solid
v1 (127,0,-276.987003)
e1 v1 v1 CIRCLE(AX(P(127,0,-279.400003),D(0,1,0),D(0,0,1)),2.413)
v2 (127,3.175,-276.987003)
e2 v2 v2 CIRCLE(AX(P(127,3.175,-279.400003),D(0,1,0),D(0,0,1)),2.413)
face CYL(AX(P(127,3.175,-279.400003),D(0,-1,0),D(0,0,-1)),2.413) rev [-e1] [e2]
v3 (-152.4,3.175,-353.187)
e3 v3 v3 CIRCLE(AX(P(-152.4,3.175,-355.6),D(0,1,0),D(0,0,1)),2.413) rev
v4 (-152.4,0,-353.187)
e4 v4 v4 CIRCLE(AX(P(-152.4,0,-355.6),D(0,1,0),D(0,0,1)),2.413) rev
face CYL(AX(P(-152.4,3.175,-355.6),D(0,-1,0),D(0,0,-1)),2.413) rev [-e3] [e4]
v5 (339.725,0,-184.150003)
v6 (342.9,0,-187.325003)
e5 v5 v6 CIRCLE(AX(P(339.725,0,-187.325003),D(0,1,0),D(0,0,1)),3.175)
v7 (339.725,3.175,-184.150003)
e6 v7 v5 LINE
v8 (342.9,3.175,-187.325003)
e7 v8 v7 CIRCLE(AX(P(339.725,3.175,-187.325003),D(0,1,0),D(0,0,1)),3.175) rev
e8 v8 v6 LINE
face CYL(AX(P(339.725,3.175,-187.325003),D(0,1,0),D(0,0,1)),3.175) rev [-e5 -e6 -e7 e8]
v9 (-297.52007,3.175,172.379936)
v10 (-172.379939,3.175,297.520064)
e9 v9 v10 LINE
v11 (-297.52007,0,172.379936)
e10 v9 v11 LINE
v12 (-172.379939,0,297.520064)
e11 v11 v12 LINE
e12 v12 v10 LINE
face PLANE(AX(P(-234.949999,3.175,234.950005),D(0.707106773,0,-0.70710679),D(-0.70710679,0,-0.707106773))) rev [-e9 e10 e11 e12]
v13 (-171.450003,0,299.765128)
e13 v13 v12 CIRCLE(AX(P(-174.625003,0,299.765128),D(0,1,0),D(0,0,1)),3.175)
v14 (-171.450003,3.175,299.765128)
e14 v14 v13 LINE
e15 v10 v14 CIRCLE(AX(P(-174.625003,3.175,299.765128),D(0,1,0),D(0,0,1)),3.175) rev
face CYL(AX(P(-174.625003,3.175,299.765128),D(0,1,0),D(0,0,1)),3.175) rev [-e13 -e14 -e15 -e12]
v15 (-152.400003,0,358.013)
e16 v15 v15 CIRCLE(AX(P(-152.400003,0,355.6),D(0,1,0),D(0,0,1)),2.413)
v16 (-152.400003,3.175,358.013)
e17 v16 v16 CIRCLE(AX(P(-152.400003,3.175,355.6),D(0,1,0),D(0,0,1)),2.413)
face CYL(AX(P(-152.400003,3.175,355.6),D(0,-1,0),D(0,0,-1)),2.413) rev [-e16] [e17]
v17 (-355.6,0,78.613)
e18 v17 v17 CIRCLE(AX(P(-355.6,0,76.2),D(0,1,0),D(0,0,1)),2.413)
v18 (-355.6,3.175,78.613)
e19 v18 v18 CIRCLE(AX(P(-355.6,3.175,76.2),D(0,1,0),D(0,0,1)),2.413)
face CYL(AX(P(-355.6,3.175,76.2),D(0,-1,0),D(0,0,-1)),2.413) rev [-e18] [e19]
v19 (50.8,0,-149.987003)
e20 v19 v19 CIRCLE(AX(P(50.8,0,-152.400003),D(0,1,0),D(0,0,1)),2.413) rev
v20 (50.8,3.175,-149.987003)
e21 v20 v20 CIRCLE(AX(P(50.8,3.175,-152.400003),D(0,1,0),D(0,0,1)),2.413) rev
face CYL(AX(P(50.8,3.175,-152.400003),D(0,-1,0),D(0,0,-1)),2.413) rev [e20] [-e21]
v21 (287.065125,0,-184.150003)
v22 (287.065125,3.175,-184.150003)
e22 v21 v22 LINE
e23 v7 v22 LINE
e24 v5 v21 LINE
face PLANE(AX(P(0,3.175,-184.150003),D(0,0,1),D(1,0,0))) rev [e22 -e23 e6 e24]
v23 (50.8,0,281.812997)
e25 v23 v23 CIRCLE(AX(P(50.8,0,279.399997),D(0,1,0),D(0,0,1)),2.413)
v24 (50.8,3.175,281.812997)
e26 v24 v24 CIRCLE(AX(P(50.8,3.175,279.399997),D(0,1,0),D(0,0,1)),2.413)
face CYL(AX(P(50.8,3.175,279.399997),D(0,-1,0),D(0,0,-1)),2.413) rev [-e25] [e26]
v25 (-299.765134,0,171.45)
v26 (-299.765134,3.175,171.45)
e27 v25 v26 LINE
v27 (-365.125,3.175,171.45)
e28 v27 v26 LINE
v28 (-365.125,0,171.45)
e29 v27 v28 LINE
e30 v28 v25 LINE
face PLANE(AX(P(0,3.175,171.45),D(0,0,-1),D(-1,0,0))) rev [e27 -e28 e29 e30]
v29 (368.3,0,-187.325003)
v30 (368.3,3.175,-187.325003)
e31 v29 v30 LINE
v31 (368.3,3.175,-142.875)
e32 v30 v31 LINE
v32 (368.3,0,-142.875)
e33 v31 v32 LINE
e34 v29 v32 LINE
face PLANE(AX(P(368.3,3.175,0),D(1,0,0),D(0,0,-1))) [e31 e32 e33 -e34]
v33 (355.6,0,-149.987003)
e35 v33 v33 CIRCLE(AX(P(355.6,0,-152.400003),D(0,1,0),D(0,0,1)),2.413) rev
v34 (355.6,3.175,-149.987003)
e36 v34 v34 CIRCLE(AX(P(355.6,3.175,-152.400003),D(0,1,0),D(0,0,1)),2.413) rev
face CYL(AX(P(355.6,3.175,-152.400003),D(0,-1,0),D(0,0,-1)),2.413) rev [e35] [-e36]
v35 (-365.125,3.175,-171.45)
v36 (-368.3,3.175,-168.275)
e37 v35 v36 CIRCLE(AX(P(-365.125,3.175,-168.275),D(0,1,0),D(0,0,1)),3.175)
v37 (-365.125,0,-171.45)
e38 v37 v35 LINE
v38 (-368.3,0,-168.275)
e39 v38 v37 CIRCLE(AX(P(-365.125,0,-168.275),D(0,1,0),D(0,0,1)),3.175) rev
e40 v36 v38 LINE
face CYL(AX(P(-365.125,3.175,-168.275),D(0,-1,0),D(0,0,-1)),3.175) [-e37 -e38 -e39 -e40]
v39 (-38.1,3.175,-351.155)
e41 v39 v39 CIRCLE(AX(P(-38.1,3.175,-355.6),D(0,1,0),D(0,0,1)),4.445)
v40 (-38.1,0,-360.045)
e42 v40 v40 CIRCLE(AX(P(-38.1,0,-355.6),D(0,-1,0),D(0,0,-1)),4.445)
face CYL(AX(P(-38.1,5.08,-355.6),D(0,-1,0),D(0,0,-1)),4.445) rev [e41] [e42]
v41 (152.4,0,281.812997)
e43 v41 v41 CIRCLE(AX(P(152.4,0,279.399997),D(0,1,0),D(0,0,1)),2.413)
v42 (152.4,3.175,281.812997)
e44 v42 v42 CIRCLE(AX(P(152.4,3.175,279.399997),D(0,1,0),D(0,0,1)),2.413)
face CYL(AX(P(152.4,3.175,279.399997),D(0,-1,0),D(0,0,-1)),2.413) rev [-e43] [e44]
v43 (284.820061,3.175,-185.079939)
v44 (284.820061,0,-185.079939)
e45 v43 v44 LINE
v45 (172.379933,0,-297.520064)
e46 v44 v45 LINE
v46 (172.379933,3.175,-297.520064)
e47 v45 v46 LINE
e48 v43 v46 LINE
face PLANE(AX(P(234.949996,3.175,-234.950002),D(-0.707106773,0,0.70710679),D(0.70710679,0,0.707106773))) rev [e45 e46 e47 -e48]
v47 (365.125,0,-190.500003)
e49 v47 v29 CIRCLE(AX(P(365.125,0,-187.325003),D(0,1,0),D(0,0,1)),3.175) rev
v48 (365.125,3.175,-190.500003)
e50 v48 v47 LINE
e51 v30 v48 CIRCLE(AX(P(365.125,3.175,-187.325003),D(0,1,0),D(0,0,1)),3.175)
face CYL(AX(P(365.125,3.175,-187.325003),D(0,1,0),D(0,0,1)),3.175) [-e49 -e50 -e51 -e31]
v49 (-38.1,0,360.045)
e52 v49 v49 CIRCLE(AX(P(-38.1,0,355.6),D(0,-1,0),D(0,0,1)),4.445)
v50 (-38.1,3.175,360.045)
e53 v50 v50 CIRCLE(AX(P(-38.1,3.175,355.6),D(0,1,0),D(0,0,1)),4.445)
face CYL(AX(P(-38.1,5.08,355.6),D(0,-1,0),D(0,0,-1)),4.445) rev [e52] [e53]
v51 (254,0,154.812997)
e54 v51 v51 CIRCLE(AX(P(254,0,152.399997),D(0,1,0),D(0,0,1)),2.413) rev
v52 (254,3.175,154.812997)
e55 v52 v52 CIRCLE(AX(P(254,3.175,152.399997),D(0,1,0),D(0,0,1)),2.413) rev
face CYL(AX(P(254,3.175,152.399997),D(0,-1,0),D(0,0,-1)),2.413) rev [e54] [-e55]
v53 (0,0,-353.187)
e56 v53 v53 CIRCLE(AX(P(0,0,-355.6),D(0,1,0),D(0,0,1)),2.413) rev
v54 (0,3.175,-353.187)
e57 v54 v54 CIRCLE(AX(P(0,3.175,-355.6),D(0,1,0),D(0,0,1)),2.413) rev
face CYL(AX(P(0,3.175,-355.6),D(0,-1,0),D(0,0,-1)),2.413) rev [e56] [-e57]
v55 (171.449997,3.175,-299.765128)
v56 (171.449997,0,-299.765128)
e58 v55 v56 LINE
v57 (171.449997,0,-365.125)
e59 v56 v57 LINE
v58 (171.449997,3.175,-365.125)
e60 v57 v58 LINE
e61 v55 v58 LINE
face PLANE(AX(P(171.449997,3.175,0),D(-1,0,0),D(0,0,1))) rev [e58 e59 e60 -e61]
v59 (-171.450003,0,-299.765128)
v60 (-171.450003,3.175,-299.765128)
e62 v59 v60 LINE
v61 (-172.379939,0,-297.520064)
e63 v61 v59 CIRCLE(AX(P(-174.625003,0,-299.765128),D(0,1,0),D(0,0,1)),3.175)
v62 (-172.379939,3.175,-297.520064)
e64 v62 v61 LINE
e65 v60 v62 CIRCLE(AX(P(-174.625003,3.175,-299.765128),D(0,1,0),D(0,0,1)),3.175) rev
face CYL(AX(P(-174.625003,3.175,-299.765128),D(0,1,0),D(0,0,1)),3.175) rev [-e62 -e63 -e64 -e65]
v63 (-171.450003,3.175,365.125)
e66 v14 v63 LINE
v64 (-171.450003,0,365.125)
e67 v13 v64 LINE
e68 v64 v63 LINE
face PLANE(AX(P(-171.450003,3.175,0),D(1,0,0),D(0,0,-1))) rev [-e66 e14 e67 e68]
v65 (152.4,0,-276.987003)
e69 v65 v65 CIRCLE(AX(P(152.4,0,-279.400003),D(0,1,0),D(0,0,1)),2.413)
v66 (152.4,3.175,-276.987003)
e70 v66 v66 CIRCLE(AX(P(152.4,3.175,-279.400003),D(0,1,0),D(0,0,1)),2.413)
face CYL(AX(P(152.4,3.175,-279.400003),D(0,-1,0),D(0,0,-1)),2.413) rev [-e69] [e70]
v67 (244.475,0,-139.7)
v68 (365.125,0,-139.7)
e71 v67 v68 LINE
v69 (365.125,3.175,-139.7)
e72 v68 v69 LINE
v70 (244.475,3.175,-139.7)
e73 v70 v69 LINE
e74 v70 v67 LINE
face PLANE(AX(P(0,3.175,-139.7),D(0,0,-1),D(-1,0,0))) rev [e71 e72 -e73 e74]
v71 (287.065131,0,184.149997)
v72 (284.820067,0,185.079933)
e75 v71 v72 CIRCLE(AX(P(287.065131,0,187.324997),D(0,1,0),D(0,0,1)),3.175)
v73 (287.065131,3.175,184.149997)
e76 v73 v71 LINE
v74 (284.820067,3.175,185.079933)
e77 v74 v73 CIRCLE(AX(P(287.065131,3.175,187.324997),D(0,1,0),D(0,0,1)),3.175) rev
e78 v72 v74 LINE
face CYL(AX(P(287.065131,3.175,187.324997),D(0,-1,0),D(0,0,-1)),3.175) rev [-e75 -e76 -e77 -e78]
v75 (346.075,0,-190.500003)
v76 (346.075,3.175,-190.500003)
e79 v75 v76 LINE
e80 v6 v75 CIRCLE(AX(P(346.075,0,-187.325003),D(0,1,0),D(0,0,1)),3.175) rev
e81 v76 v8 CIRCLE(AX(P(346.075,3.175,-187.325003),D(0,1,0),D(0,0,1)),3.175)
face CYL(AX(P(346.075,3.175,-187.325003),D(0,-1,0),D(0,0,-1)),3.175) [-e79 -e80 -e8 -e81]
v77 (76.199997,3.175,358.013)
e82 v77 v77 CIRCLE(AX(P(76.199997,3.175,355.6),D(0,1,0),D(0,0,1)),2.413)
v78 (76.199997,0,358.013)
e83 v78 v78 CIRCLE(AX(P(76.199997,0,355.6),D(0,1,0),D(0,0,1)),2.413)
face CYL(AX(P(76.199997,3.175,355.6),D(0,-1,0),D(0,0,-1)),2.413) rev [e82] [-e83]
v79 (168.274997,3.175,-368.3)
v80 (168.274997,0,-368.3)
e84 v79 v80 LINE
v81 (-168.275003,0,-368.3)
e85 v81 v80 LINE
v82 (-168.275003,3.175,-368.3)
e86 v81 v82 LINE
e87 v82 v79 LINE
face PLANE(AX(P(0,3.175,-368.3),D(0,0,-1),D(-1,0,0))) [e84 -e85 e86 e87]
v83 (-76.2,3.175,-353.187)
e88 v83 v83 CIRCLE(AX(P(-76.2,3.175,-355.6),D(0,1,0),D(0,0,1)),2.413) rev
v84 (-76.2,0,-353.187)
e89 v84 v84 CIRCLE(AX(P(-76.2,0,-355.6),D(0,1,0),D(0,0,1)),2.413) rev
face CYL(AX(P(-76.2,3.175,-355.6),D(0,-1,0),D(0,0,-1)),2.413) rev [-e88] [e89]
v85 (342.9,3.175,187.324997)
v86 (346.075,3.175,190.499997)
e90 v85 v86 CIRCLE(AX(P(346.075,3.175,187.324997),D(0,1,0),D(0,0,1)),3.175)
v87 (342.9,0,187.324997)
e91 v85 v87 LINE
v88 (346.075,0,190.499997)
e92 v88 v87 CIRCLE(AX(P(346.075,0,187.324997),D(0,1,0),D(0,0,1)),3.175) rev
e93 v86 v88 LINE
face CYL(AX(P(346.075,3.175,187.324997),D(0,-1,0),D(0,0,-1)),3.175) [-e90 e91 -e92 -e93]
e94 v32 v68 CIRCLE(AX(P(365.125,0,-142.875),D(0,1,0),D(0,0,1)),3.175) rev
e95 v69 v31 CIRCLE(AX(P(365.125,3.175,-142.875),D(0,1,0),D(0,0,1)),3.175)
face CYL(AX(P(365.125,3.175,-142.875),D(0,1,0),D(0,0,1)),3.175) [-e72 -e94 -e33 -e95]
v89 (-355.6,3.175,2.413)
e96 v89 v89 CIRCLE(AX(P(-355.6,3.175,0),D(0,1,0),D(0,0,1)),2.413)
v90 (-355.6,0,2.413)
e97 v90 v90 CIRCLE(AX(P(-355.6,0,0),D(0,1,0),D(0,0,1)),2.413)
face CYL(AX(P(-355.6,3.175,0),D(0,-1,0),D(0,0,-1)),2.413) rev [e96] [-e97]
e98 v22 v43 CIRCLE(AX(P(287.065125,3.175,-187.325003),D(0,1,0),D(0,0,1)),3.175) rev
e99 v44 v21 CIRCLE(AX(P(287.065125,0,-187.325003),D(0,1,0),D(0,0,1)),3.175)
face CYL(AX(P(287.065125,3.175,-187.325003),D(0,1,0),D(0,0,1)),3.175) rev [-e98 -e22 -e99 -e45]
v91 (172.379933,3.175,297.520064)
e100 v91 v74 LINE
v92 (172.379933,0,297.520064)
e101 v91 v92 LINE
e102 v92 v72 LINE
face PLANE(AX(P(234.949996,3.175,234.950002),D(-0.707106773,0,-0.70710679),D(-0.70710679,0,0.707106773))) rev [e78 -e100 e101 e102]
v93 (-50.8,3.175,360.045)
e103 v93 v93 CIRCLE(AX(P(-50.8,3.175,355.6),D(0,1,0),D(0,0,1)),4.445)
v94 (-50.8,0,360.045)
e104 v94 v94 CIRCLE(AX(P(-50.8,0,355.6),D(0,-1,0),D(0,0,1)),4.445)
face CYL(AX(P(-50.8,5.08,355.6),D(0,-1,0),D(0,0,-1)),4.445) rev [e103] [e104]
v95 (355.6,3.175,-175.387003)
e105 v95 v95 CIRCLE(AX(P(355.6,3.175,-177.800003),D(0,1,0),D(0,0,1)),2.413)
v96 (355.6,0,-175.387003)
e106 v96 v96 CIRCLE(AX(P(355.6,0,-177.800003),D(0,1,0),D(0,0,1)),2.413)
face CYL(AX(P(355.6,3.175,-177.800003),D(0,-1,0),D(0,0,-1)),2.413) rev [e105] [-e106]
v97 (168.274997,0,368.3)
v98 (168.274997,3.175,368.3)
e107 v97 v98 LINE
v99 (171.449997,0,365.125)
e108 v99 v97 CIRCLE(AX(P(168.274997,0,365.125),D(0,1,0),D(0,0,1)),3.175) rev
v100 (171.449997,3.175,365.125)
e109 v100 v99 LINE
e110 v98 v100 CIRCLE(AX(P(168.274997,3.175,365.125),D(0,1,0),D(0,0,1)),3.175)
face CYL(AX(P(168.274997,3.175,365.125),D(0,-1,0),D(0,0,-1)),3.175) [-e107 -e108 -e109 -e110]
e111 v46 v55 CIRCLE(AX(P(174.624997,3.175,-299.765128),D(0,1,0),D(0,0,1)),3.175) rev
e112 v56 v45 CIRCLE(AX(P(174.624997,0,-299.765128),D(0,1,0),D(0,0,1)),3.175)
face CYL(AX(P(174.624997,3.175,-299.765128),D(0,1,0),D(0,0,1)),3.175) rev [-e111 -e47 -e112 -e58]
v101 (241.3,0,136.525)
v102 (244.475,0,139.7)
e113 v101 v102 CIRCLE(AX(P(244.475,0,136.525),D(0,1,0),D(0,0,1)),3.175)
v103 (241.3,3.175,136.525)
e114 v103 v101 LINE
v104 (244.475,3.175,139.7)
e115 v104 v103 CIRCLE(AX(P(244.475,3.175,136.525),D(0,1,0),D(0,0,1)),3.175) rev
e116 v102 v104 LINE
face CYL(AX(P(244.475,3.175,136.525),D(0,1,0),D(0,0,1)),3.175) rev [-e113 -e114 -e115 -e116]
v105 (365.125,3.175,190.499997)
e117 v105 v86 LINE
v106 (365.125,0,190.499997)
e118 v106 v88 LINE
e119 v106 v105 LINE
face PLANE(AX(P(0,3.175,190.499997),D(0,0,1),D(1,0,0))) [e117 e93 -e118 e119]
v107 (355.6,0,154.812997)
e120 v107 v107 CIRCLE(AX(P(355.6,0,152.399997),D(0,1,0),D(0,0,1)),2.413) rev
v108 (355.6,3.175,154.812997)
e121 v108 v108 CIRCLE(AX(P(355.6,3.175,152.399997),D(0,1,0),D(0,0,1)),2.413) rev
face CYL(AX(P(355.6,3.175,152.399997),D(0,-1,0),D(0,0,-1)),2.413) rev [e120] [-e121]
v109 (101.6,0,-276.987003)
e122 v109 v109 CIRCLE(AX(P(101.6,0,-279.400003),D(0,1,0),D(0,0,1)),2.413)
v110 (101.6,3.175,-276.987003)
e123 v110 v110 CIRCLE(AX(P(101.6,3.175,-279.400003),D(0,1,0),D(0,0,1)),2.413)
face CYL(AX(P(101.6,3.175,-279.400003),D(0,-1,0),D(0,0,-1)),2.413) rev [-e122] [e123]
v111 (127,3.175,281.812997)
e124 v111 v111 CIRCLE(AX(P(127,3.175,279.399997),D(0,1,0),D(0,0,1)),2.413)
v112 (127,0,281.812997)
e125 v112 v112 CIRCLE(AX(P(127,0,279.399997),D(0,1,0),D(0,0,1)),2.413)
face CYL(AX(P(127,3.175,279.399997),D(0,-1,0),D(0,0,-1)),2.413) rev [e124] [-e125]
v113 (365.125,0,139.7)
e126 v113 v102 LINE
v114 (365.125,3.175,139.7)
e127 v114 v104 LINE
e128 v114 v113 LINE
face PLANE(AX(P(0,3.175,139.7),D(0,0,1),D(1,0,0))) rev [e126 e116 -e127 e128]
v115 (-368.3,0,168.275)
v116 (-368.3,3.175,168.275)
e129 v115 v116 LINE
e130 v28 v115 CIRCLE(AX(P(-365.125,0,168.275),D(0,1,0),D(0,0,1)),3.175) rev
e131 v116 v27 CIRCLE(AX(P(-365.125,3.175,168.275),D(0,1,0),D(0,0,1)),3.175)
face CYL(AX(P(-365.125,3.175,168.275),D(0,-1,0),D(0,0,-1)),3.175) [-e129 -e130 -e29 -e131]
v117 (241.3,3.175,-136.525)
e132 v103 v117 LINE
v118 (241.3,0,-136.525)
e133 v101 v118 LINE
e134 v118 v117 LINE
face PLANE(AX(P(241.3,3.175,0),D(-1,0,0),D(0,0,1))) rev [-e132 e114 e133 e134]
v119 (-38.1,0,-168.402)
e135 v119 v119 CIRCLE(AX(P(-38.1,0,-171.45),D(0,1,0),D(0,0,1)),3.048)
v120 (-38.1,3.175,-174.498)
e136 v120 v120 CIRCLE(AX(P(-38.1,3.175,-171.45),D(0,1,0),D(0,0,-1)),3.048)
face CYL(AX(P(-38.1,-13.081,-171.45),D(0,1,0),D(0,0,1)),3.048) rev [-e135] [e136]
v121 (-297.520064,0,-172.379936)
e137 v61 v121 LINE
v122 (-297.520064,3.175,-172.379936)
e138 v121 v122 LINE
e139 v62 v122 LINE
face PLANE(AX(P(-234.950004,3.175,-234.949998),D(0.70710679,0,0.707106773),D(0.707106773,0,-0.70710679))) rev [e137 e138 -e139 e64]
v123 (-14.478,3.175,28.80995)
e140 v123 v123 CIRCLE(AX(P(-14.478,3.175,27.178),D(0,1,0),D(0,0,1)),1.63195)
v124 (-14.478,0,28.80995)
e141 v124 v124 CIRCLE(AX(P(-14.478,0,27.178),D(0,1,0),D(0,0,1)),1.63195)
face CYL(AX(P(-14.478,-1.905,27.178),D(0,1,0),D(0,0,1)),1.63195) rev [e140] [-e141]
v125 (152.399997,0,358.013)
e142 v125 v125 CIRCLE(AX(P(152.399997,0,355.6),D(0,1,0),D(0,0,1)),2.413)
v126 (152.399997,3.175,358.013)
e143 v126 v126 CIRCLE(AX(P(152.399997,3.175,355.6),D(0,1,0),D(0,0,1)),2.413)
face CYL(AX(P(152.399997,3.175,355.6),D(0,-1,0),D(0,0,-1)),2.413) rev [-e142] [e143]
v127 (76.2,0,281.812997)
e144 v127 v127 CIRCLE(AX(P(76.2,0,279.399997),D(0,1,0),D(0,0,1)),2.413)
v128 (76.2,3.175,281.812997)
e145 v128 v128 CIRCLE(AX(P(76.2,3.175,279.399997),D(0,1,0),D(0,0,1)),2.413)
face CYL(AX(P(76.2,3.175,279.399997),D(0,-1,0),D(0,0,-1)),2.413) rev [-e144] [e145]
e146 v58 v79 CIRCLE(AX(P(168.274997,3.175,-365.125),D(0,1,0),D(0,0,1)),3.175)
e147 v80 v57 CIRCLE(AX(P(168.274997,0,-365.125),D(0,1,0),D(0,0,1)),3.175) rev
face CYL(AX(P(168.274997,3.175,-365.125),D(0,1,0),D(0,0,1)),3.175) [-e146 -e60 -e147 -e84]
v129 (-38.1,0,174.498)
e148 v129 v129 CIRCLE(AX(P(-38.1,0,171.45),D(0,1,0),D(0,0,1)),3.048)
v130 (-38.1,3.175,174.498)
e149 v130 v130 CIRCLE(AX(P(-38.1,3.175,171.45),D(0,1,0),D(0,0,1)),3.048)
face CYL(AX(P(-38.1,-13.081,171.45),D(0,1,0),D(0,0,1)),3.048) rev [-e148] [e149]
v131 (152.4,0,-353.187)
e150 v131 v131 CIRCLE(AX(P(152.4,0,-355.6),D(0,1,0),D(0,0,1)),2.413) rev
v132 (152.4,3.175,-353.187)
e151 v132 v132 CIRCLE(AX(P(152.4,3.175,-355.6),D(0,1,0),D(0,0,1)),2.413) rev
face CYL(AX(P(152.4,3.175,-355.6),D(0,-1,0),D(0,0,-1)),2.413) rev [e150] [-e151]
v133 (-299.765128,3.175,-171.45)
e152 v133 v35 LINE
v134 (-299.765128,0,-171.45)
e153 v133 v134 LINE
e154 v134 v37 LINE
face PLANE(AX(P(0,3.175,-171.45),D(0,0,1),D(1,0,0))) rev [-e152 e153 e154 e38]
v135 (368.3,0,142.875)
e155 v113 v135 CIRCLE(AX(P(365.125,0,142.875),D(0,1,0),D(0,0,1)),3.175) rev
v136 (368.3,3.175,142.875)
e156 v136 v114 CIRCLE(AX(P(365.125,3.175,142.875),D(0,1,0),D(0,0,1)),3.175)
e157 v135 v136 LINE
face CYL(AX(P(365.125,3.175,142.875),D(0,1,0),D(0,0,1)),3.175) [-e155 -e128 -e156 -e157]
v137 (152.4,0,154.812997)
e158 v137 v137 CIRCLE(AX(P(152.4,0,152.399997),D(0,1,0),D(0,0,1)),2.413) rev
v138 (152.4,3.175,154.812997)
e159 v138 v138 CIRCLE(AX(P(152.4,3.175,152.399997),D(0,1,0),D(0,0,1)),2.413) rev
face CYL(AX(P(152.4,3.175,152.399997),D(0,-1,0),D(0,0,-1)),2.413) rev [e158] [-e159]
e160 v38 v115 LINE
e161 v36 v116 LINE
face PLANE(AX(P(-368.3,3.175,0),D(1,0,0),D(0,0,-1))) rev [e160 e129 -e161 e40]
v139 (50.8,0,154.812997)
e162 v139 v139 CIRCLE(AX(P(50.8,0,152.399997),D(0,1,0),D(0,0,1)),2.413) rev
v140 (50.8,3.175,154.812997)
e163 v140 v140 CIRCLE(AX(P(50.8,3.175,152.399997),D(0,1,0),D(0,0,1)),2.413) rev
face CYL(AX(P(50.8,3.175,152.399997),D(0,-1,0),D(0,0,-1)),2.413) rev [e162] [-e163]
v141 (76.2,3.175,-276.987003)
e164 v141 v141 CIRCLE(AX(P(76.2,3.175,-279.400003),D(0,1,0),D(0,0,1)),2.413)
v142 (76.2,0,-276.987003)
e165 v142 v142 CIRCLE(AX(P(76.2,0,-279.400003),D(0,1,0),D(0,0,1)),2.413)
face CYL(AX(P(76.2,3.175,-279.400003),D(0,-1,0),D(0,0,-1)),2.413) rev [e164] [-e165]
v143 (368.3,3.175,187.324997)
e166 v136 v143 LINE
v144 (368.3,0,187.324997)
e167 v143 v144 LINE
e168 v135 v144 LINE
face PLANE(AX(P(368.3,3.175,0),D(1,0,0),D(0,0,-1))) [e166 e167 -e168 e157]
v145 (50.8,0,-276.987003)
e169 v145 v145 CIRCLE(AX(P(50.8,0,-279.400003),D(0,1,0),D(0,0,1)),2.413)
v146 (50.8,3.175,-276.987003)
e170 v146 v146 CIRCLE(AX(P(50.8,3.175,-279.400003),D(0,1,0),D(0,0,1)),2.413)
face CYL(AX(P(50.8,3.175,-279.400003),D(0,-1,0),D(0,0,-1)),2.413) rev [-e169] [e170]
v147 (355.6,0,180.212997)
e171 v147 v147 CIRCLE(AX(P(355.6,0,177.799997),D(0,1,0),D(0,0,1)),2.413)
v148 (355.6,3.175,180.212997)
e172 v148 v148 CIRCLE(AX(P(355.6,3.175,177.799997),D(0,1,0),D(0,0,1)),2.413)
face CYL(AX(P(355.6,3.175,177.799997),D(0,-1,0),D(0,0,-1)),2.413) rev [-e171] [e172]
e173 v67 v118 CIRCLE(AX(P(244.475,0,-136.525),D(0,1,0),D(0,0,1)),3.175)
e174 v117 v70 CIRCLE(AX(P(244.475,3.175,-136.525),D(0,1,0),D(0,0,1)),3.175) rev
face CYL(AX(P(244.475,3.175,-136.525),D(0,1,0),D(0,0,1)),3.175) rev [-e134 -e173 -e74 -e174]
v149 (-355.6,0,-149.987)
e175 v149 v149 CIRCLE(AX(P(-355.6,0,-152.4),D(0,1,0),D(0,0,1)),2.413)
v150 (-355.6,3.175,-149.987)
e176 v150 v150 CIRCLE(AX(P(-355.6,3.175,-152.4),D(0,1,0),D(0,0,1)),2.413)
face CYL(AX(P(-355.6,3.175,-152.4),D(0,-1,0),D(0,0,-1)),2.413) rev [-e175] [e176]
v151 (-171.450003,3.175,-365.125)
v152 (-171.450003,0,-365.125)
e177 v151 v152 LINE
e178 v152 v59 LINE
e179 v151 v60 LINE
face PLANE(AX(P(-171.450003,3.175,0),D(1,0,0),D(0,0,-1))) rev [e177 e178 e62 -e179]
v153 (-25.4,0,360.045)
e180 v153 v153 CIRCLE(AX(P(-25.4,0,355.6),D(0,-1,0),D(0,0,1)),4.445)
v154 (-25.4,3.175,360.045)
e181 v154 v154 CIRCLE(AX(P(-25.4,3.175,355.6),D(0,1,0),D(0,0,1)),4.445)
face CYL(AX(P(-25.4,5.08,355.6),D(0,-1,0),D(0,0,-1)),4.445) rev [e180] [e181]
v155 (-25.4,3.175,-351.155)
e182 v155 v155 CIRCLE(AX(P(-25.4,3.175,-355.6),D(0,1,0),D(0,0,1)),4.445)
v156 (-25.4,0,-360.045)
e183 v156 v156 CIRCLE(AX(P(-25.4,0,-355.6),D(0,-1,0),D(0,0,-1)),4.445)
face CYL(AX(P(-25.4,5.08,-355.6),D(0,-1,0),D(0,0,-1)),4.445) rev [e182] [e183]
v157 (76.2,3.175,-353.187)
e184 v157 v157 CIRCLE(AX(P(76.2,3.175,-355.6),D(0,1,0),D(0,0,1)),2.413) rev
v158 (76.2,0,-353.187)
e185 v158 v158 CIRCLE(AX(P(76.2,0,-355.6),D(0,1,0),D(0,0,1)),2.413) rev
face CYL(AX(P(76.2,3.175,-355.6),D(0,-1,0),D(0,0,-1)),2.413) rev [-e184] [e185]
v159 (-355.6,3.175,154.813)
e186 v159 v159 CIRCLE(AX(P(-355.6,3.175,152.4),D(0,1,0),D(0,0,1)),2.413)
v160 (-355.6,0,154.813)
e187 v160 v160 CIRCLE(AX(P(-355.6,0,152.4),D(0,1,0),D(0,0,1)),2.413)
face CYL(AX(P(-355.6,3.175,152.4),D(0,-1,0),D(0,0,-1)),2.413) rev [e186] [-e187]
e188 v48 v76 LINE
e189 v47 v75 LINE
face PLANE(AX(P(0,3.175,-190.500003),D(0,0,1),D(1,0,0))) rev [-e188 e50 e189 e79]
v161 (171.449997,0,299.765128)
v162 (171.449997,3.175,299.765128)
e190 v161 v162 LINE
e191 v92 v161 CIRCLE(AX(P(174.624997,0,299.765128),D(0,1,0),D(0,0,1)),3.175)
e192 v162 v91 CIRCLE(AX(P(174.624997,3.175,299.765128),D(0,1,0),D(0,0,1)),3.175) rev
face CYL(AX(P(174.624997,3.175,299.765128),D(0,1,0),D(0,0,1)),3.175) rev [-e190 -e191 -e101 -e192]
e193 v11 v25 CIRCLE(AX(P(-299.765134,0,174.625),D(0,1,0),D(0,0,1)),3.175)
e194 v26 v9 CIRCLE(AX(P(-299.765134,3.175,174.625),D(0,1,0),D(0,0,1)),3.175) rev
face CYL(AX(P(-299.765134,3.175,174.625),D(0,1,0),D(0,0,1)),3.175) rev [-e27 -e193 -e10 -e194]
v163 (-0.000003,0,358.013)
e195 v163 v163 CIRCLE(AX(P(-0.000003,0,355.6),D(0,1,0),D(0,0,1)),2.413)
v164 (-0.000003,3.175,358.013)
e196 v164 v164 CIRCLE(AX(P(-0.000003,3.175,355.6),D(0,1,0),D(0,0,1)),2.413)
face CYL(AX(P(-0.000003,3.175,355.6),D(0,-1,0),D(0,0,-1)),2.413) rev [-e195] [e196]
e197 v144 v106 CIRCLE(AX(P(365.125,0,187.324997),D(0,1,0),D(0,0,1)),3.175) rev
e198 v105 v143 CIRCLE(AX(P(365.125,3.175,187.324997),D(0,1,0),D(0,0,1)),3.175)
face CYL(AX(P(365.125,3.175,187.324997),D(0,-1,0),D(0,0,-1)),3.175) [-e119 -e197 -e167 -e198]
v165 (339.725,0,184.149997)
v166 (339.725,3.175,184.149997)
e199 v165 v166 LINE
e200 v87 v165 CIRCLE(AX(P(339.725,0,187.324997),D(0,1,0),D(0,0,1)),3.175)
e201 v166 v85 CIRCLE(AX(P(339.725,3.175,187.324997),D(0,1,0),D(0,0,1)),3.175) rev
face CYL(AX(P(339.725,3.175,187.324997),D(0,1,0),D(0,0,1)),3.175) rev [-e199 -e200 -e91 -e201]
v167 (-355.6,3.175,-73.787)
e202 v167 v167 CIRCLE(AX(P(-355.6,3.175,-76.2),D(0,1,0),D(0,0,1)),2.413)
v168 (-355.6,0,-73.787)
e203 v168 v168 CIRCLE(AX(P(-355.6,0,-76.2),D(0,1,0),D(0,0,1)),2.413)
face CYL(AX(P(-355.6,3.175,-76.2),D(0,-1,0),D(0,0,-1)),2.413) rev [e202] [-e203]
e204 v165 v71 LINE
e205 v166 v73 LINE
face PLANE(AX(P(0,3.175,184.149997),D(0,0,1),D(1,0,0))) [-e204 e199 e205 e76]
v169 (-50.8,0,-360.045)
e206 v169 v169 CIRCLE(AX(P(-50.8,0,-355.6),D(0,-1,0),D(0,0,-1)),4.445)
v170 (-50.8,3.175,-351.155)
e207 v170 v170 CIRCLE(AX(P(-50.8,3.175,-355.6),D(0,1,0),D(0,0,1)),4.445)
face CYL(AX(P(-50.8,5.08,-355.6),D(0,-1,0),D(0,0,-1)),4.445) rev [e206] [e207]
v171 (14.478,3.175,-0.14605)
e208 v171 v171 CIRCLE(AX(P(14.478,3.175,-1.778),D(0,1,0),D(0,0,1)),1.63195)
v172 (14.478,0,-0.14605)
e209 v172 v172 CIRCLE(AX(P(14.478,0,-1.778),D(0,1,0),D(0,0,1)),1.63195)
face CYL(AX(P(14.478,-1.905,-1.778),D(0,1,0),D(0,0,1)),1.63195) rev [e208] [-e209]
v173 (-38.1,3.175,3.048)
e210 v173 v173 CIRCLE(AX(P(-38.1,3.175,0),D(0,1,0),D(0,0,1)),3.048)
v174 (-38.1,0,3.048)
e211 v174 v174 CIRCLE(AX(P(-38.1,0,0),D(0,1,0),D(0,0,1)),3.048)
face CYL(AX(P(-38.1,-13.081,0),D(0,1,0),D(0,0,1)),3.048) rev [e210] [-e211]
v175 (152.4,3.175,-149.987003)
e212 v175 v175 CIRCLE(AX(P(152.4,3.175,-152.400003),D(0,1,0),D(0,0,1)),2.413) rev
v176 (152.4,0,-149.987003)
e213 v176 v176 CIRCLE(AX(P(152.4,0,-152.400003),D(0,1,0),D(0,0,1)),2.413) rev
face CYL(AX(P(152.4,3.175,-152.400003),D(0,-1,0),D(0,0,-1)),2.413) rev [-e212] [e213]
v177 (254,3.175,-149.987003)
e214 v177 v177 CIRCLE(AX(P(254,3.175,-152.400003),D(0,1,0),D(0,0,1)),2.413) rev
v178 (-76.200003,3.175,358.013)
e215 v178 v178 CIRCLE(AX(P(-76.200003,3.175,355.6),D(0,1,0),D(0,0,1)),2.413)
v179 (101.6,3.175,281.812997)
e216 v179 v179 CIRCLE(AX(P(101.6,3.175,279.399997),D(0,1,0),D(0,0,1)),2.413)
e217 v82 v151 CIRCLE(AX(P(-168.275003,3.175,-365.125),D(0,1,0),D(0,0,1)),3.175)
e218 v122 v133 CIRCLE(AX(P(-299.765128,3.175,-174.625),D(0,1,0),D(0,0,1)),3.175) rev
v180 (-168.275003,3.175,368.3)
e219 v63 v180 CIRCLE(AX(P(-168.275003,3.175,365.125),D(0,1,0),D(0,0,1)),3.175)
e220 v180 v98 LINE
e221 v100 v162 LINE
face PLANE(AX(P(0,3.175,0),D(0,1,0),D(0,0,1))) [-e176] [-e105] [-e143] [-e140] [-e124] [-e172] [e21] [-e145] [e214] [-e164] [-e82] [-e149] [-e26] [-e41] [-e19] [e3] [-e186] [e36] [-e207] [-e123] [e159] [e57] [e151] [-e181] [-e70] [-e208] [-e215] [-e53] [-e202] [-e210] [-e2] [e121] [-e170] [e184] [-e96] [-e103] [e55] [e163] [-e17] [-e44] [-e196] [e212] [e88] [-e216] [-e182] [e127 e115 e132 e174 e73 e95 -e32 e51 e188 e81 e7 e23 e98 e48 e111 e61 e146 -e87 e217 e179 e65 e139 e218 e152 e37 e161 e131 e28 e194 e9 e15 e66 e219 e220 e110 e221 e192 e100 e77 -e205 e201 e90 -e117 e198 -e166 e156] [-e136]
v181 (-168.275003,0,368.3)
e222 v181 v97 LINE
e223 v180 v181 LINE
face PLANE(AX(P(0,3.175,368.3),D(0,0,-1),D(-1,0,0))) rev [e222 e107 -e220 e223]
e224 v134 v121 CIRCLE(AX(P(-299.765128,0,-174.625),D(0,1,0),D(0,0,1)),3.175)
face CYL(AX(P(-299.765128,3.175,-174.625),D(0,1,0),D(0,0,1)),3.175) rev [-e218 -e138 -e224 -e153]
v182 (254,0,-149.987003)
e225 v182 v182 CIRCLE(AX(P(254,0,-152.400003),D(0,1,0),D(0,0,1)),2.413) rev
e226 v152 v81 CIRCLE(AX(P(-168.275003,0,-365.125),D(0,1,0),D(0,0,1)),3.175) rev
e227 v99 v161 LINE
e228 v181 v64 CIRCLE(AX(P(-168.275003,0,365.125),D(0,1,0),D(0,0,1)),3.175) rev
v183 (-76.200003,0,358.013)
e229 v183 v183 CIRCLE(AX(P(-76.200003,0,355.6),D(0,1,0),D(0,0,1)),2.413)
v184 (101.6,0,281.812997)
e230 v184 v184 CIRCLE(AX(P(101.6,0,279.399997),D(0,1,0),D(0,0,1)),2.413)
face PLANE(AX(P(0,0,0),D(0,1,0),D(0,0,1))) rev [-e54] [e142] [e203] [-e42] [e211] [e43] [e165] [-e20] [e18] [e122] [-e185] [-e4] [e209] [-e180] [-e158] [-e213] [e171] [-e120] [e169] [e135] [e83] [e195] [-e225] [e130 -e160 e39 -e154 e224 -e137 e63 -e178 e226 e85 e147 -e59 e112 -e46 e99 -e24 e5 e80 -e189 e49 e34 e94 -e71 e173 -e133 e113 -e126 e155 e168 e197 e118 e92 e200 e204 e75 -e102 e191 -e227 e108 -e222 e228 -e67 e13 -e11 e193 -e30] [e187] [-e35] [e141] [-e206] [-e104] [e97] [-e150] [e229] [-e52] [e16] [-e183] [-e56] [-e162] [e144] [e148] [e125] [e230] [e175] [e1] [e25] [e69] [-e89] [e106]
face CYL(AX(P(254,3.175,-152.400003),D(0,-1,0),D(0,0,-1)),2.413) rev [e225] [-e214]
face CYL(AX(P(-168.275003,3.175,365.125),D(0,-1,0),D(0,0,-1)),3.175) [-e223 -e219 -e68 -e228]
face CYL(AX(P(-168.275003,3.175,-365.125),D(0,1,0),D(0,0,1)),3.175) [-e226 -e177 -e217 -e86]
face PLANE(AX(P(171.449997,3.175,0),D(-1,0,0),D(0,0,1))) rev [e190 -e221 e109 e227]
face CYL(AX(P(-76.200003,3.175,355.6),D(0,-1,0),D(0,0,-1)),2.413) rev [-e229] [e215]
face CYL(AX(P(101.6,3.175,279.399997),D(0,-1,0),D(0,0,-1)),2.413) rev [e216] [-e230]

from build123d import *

# Parameters (mm, degrees)
SKETCH1_R           = 2.413
BOSS_EXTRUDE2_DEPTH = 3.175
FILLET2_R           = 3.175
SKETCH2_R           = 1.63195
CUT_EXTRUDE1_DEPTH  = 5.08
SKETCH3_R           = 4.445
CUT_EXTRUDE2_DEPTH  = 5.08
SKETCH8_R           = 3.048
CUT_EXTRUDE3_DEPTH  = 16.256


with BuildPart() as part:
    # Sketch1 → Boss-Extrude2 (new body)
    with BuildSketch(Plane(origin=(0, 0, 0), x_dir=(1, 0, 0), z_dir=(0, 1, 0))):
        Polygon((368.3, 139.7), (368.3, 190.500003027), (342.9, 190.500003027), (342.9, 184.150003027), (285.749996671, 184.150003027), (171.449996973, 298.45), (171.449996973, 368.3), (-171.450003027, 368.3), (-171.450003027, 298.45), (-298.45, 171.45), (-368.3, 171.45), (-368.3, -171.45), (-298.450006054, -171.45), (-171.450003027, -298.45), (-171.450003027, -368.3), (171.449996973, -368.3), (171.449996973, -298.45), (285.750002724, -184.149996973), (342.9, -184.149996973), (342.9, -190.499996973), (368.3, -190.499996973), (368.3, -139.7), (241.3, -139.7), (241.3, 139.7), align=None)
        with Locations(Location((-152.400003027, -355.6, 0), (0, 0, 270))):
            Circle(SKETCH1_R, mode=Mode.SUBTRACT)
        with Locations(Location((-76.200003027, -355.6, 0), (0, 0, 270))):
            Circle(SKETCH1_R, mode=Mode.SUBTRACT)
        with Locations(Location((-3.027e-06, -355.6, 0), (0, 0, 270))):
            Circle(SKETCH1_R, mode=Mode.SUBTRACT)
        with Locations(Location((-355.6, -152.4, 0), (0, 0, 270))):
            Circle(SKETCH1_R, mode=Mode.SUBTRACT)
        with Locations(Location((-355.6, -76.2, 0), (0, 0, 270))):
            Circle(SKETCH1_R, mode=Mode.SUBTRACT)
        with Locations(Location((76.199996973, -355.6, 0), (0, 0, 270))):
            Circle(SKETCH1_R, mode=Mode.SUBTRACT)
        with Locations(Location((50.8, -279.399996973, 0), (0, 0, 270))):
            Circle(SKETCH1_R, mode=Mode.SUBTRACT)
        with Locations(Location((76.2, -279.399996973, 0), (0, 0, 270))):
            Circle(SKETCH1_R, mode=Mode.SUBTRACT)
        with Locations(Location((152.399996973, -355.6, 0), (0, 0, 270))):
            Circle(SKETCH1_R, mode=Mode.SUBTRACT)
        with Locations(Location((101.6, -279.399996973, 0), (0, 0, 270))):
            Circle(SKETCH1_R, mode=Mode.SUBTRACT)
        with Locations(Location((127, -279.399996973, 0), (0, 0, 270))):
            Circle(SKETCH1_R, mode=Mode.SUBTRACT)
        with Locations(Location((152.4, -279.399996973, 0), (0, 0, 270))):
            Circle(SKETCH1_R, mode=Mode.SUBTRACT)
        with Locations(Location((50.8, -152.399996973, 0), (0, 0, 270))):
            Circle(SKETCH1_R, mode=Mode.SUBTRACT)
        with Locations(Location((152.4, -152.399996973, 0), (0, 0, 270))):
            Circle(SKETCH1_R, mode=Mode.SUBTRACT)
        with Locations(Location((254, -152.399996973, 0), (0, 0, 270))):
            Circle(SKETCH1_R, mode=Mode.SUBTRACT)
        with Locations(Location((355.6, -152.399996973, 0), (0, 0, 270))):
            Circle(SKETCH1_R, mode=Mode.SUBTRACT)
        with Locations(Location((-355.6, 0, 0), (0, 0, 270))):
            Circle(SKETCH1_R, mode=Mode.SUBTRACT)
        with Locations(Location((-355.6, 76.2, 0), (0, 0, 270))):
            Circle(SKETCH1_R, mode=Mode.SUBTRACT)
        with Locations(Location((-355.6, 152.4, 0), (0, 0, 270))):
            Circle(SKETCH1_R, mode=Mode.SUBTRACT)
        with Locations(Location((-152.4, 355.6, 0), (0, 0, 270))):
            Circle(SKETCH1_R, mode=Mode.SUBTRACT)
        with Locations(Location((-76.2, 355.6, 0), (0, 0, 270))):
            Circle(SKETCH1_R, mode=Mode.SUBTRACT)
        with Locations(Location((0, 355.6, 0), (0, 0, 270))):
            Circle(SKETCH1_R, mode=Mode.SUBTRACT)
        with Locations(Location((50.8, 152.400003027, 0), (0, 0, 270))):
            Circle(SKETCH1_R, mode=Mode.SUBTRACT)
        with Locations(Location((152.4, 152.400003027, 0), (0, 0, 270))):
            Circle(SKETCH1_R, mode=Mode.SUBTRACT)
        with Locations(Location((254, 152.400003027, 0), (0, 0, 270))):
            Circle(SKETCH1_R, mode=Mode.SUBTRACT)
        with Locations(Location((355.6, 152.400003027, 0), (0, 0, 270))):
            Circle(SKETCH1_R, mode=Mode.SUBTRACT)
        with Locations(Location((50.8, 279.400003027, 0), (0, 0, 270))):
            Circle(SKETCH1_R, mode=Mode.SUBTRACT)
        with Locations(Location((76.2, 279.400003027, 0), (0, 0, 270))):
            Circle(SKETCH1_R, mode=Mode.SUBTRACT)
        with Locations(Location((76.2, 355.6, 0), (0, 0, 270))):
            Circle(SKETCH1_R, mode=Mode.SUBTRACT)
        with Locations(Location((101.6, 279.400003027, 0), (0, 0, 270))):
            Circle(SKETCH1_R, mode=Mode.SUBTRACT)
        with Locations(Location((127, 279.400003027, 0), (0, 0, 270))):
            Circle(SKETCH1_R, mode=Mode.SUBTRACT)
        with Locations(Location((152.4, 279.400003027, 0), (0, 0, 270))):
            Circle(SKETCH1_R, mode=Mode.SUBTRACT)
        with Locations(Location((152.4, 355.6, 0), (0, 0, 270))):
            Circle(SKETCH1_R, mode=Mode.SUBTRACT)
        with Locations(Location((355.6, 177.800003027, 0), (0, 0, 270))):
            Circle(SKETCH1_R, mode=Mode.SUBTRACT)
        with Locations(Location((355.6, -177.799996973, 0), (0, 0, 270))):
            Circle(SKETCH1_R, mode=Mode.SUBTRACT)
    extrude(amount=BOSS_EXTRUDE2_DEPTH)

    # Fillet2
    fillet2_edges = [part.edges().sort_by_distance(p)[0] for p in [
        (171.449996973, 1.5875, 298.45),
        (-171.450003027, 1.5875, 368.3),
        (-171.450003027, 1.5875, 298.45),
        (-298.450006054, 1.5875, 171.45),
        (-368.3, 1.5875, 171.45),
        (-368.3, 1.5875, -171.45),
        (-298.45, 1.5875, -171.45),
        (-171.450003027, 1.5875, -298.45),
        (-171.450003027, 1.5875, -368.3),
        (171.449996973, 1.5875, -368.3),
        (171.449996973, 1.5875, -298.45),
        (171.449996973, 1.5875, 368.3),
        (241.3, 1.5875, 139.7),
        (368.3, 1.5875, 139.7),
        (285.750002724, 1.5875, 184.149996973),
        (285.749996671, 1.5875, -184.150003027),
        (368.3, 1.5875, -139.7),
        (241.3, 1.5875, -139.7),
        (342.9, 1.5875, 190.499996973),
        (342.9, 1.5875, 184.149996973),
        (342.9, 1.5875, -184.150003027),
        (342.9, 1.5875, -190.500003027),
        (368.3, 1.5875, -190.500003027),
        (368.3, 1.5875, 190.499996973),
    ]]
    fillet(fillet2_edges, radius=FILLET2_R - 0.0001)  # a hair under: the kernel refuses the full size

    # Sketch2 → Cut-Extrude1 (cut)
    with BuildSketch(Plane(origin=(0, 3.175, 0), x_dir=(1, 0, 0), z_dir=(0, 1, 0))):
        with Locations(Location((14.478, 1.778, 0), (0, 0, 270))):
            Circle(SKETCH2_R)
        with Locations(Location((-14.478, -27.178, 0), (0, 0, 270))):
            Circle(SKETCH2_R)
    extrude(amount=-CUT_EXTRUDE1_DEPTH, mode=Mode.SUBTRACT)

    # Sketch3 → Cut-Extrude2 (cut)
    with BuildSketch(Plane.XZ):
        with Locations(Location((-25.4, -355.6, 0), (0, 0, 270))):
            Circle(SKETCH3_R)
        with Locations(Location((-38.1, -355.6, 0), (0, 0, 270))):
            Circle(SKETCH3_R)
        with Locations(Location((-50.8, -355.6, 0), (0, 0, 270))):
            Circle(SKETCH3_R)
        with Locations(Location((-50.8, 355.6, 0), (0, 0, 90))):
            Circle(SKETCH3_R)
        with Locations(Location((-38.1, 355.6, 0), (0, 0, 90))):
            Circle(SKETCH3_R)
        with Locations(Location((-25.4, 355.6, 0), (0, 0, 90))):
            Circle(SKETCH3_R)
    extrude(amount=-CUT_EXTRUDE2_DEPTH, mode=Mode.SUBTRACT)

    # Sketch8 → Cut-Extrude3 (cut)
    with BuildSketch(Plane(origin=(0, 3.175, 0), x_dir=(1, 0, 0), z_dir=(0, 1, 0))):
        with Locations(Location((-38.1, -171.45, 0), (0, 0, 270))):
            Circle(SKETCH8_R)
        with Locations(Location((-38.1, 171.45, 0), (0, 0, 270))):
            Circle(SKETCH8_R)
        with Locations(Location((-38.1, 0, 0), (0, 0, 270))):
            Circle(SKETCH8_R)
    extrude(amount=-CUT_EXTRUDE3_DEPTH, mode=Mode.SUBTRACT)


solid = part.part
